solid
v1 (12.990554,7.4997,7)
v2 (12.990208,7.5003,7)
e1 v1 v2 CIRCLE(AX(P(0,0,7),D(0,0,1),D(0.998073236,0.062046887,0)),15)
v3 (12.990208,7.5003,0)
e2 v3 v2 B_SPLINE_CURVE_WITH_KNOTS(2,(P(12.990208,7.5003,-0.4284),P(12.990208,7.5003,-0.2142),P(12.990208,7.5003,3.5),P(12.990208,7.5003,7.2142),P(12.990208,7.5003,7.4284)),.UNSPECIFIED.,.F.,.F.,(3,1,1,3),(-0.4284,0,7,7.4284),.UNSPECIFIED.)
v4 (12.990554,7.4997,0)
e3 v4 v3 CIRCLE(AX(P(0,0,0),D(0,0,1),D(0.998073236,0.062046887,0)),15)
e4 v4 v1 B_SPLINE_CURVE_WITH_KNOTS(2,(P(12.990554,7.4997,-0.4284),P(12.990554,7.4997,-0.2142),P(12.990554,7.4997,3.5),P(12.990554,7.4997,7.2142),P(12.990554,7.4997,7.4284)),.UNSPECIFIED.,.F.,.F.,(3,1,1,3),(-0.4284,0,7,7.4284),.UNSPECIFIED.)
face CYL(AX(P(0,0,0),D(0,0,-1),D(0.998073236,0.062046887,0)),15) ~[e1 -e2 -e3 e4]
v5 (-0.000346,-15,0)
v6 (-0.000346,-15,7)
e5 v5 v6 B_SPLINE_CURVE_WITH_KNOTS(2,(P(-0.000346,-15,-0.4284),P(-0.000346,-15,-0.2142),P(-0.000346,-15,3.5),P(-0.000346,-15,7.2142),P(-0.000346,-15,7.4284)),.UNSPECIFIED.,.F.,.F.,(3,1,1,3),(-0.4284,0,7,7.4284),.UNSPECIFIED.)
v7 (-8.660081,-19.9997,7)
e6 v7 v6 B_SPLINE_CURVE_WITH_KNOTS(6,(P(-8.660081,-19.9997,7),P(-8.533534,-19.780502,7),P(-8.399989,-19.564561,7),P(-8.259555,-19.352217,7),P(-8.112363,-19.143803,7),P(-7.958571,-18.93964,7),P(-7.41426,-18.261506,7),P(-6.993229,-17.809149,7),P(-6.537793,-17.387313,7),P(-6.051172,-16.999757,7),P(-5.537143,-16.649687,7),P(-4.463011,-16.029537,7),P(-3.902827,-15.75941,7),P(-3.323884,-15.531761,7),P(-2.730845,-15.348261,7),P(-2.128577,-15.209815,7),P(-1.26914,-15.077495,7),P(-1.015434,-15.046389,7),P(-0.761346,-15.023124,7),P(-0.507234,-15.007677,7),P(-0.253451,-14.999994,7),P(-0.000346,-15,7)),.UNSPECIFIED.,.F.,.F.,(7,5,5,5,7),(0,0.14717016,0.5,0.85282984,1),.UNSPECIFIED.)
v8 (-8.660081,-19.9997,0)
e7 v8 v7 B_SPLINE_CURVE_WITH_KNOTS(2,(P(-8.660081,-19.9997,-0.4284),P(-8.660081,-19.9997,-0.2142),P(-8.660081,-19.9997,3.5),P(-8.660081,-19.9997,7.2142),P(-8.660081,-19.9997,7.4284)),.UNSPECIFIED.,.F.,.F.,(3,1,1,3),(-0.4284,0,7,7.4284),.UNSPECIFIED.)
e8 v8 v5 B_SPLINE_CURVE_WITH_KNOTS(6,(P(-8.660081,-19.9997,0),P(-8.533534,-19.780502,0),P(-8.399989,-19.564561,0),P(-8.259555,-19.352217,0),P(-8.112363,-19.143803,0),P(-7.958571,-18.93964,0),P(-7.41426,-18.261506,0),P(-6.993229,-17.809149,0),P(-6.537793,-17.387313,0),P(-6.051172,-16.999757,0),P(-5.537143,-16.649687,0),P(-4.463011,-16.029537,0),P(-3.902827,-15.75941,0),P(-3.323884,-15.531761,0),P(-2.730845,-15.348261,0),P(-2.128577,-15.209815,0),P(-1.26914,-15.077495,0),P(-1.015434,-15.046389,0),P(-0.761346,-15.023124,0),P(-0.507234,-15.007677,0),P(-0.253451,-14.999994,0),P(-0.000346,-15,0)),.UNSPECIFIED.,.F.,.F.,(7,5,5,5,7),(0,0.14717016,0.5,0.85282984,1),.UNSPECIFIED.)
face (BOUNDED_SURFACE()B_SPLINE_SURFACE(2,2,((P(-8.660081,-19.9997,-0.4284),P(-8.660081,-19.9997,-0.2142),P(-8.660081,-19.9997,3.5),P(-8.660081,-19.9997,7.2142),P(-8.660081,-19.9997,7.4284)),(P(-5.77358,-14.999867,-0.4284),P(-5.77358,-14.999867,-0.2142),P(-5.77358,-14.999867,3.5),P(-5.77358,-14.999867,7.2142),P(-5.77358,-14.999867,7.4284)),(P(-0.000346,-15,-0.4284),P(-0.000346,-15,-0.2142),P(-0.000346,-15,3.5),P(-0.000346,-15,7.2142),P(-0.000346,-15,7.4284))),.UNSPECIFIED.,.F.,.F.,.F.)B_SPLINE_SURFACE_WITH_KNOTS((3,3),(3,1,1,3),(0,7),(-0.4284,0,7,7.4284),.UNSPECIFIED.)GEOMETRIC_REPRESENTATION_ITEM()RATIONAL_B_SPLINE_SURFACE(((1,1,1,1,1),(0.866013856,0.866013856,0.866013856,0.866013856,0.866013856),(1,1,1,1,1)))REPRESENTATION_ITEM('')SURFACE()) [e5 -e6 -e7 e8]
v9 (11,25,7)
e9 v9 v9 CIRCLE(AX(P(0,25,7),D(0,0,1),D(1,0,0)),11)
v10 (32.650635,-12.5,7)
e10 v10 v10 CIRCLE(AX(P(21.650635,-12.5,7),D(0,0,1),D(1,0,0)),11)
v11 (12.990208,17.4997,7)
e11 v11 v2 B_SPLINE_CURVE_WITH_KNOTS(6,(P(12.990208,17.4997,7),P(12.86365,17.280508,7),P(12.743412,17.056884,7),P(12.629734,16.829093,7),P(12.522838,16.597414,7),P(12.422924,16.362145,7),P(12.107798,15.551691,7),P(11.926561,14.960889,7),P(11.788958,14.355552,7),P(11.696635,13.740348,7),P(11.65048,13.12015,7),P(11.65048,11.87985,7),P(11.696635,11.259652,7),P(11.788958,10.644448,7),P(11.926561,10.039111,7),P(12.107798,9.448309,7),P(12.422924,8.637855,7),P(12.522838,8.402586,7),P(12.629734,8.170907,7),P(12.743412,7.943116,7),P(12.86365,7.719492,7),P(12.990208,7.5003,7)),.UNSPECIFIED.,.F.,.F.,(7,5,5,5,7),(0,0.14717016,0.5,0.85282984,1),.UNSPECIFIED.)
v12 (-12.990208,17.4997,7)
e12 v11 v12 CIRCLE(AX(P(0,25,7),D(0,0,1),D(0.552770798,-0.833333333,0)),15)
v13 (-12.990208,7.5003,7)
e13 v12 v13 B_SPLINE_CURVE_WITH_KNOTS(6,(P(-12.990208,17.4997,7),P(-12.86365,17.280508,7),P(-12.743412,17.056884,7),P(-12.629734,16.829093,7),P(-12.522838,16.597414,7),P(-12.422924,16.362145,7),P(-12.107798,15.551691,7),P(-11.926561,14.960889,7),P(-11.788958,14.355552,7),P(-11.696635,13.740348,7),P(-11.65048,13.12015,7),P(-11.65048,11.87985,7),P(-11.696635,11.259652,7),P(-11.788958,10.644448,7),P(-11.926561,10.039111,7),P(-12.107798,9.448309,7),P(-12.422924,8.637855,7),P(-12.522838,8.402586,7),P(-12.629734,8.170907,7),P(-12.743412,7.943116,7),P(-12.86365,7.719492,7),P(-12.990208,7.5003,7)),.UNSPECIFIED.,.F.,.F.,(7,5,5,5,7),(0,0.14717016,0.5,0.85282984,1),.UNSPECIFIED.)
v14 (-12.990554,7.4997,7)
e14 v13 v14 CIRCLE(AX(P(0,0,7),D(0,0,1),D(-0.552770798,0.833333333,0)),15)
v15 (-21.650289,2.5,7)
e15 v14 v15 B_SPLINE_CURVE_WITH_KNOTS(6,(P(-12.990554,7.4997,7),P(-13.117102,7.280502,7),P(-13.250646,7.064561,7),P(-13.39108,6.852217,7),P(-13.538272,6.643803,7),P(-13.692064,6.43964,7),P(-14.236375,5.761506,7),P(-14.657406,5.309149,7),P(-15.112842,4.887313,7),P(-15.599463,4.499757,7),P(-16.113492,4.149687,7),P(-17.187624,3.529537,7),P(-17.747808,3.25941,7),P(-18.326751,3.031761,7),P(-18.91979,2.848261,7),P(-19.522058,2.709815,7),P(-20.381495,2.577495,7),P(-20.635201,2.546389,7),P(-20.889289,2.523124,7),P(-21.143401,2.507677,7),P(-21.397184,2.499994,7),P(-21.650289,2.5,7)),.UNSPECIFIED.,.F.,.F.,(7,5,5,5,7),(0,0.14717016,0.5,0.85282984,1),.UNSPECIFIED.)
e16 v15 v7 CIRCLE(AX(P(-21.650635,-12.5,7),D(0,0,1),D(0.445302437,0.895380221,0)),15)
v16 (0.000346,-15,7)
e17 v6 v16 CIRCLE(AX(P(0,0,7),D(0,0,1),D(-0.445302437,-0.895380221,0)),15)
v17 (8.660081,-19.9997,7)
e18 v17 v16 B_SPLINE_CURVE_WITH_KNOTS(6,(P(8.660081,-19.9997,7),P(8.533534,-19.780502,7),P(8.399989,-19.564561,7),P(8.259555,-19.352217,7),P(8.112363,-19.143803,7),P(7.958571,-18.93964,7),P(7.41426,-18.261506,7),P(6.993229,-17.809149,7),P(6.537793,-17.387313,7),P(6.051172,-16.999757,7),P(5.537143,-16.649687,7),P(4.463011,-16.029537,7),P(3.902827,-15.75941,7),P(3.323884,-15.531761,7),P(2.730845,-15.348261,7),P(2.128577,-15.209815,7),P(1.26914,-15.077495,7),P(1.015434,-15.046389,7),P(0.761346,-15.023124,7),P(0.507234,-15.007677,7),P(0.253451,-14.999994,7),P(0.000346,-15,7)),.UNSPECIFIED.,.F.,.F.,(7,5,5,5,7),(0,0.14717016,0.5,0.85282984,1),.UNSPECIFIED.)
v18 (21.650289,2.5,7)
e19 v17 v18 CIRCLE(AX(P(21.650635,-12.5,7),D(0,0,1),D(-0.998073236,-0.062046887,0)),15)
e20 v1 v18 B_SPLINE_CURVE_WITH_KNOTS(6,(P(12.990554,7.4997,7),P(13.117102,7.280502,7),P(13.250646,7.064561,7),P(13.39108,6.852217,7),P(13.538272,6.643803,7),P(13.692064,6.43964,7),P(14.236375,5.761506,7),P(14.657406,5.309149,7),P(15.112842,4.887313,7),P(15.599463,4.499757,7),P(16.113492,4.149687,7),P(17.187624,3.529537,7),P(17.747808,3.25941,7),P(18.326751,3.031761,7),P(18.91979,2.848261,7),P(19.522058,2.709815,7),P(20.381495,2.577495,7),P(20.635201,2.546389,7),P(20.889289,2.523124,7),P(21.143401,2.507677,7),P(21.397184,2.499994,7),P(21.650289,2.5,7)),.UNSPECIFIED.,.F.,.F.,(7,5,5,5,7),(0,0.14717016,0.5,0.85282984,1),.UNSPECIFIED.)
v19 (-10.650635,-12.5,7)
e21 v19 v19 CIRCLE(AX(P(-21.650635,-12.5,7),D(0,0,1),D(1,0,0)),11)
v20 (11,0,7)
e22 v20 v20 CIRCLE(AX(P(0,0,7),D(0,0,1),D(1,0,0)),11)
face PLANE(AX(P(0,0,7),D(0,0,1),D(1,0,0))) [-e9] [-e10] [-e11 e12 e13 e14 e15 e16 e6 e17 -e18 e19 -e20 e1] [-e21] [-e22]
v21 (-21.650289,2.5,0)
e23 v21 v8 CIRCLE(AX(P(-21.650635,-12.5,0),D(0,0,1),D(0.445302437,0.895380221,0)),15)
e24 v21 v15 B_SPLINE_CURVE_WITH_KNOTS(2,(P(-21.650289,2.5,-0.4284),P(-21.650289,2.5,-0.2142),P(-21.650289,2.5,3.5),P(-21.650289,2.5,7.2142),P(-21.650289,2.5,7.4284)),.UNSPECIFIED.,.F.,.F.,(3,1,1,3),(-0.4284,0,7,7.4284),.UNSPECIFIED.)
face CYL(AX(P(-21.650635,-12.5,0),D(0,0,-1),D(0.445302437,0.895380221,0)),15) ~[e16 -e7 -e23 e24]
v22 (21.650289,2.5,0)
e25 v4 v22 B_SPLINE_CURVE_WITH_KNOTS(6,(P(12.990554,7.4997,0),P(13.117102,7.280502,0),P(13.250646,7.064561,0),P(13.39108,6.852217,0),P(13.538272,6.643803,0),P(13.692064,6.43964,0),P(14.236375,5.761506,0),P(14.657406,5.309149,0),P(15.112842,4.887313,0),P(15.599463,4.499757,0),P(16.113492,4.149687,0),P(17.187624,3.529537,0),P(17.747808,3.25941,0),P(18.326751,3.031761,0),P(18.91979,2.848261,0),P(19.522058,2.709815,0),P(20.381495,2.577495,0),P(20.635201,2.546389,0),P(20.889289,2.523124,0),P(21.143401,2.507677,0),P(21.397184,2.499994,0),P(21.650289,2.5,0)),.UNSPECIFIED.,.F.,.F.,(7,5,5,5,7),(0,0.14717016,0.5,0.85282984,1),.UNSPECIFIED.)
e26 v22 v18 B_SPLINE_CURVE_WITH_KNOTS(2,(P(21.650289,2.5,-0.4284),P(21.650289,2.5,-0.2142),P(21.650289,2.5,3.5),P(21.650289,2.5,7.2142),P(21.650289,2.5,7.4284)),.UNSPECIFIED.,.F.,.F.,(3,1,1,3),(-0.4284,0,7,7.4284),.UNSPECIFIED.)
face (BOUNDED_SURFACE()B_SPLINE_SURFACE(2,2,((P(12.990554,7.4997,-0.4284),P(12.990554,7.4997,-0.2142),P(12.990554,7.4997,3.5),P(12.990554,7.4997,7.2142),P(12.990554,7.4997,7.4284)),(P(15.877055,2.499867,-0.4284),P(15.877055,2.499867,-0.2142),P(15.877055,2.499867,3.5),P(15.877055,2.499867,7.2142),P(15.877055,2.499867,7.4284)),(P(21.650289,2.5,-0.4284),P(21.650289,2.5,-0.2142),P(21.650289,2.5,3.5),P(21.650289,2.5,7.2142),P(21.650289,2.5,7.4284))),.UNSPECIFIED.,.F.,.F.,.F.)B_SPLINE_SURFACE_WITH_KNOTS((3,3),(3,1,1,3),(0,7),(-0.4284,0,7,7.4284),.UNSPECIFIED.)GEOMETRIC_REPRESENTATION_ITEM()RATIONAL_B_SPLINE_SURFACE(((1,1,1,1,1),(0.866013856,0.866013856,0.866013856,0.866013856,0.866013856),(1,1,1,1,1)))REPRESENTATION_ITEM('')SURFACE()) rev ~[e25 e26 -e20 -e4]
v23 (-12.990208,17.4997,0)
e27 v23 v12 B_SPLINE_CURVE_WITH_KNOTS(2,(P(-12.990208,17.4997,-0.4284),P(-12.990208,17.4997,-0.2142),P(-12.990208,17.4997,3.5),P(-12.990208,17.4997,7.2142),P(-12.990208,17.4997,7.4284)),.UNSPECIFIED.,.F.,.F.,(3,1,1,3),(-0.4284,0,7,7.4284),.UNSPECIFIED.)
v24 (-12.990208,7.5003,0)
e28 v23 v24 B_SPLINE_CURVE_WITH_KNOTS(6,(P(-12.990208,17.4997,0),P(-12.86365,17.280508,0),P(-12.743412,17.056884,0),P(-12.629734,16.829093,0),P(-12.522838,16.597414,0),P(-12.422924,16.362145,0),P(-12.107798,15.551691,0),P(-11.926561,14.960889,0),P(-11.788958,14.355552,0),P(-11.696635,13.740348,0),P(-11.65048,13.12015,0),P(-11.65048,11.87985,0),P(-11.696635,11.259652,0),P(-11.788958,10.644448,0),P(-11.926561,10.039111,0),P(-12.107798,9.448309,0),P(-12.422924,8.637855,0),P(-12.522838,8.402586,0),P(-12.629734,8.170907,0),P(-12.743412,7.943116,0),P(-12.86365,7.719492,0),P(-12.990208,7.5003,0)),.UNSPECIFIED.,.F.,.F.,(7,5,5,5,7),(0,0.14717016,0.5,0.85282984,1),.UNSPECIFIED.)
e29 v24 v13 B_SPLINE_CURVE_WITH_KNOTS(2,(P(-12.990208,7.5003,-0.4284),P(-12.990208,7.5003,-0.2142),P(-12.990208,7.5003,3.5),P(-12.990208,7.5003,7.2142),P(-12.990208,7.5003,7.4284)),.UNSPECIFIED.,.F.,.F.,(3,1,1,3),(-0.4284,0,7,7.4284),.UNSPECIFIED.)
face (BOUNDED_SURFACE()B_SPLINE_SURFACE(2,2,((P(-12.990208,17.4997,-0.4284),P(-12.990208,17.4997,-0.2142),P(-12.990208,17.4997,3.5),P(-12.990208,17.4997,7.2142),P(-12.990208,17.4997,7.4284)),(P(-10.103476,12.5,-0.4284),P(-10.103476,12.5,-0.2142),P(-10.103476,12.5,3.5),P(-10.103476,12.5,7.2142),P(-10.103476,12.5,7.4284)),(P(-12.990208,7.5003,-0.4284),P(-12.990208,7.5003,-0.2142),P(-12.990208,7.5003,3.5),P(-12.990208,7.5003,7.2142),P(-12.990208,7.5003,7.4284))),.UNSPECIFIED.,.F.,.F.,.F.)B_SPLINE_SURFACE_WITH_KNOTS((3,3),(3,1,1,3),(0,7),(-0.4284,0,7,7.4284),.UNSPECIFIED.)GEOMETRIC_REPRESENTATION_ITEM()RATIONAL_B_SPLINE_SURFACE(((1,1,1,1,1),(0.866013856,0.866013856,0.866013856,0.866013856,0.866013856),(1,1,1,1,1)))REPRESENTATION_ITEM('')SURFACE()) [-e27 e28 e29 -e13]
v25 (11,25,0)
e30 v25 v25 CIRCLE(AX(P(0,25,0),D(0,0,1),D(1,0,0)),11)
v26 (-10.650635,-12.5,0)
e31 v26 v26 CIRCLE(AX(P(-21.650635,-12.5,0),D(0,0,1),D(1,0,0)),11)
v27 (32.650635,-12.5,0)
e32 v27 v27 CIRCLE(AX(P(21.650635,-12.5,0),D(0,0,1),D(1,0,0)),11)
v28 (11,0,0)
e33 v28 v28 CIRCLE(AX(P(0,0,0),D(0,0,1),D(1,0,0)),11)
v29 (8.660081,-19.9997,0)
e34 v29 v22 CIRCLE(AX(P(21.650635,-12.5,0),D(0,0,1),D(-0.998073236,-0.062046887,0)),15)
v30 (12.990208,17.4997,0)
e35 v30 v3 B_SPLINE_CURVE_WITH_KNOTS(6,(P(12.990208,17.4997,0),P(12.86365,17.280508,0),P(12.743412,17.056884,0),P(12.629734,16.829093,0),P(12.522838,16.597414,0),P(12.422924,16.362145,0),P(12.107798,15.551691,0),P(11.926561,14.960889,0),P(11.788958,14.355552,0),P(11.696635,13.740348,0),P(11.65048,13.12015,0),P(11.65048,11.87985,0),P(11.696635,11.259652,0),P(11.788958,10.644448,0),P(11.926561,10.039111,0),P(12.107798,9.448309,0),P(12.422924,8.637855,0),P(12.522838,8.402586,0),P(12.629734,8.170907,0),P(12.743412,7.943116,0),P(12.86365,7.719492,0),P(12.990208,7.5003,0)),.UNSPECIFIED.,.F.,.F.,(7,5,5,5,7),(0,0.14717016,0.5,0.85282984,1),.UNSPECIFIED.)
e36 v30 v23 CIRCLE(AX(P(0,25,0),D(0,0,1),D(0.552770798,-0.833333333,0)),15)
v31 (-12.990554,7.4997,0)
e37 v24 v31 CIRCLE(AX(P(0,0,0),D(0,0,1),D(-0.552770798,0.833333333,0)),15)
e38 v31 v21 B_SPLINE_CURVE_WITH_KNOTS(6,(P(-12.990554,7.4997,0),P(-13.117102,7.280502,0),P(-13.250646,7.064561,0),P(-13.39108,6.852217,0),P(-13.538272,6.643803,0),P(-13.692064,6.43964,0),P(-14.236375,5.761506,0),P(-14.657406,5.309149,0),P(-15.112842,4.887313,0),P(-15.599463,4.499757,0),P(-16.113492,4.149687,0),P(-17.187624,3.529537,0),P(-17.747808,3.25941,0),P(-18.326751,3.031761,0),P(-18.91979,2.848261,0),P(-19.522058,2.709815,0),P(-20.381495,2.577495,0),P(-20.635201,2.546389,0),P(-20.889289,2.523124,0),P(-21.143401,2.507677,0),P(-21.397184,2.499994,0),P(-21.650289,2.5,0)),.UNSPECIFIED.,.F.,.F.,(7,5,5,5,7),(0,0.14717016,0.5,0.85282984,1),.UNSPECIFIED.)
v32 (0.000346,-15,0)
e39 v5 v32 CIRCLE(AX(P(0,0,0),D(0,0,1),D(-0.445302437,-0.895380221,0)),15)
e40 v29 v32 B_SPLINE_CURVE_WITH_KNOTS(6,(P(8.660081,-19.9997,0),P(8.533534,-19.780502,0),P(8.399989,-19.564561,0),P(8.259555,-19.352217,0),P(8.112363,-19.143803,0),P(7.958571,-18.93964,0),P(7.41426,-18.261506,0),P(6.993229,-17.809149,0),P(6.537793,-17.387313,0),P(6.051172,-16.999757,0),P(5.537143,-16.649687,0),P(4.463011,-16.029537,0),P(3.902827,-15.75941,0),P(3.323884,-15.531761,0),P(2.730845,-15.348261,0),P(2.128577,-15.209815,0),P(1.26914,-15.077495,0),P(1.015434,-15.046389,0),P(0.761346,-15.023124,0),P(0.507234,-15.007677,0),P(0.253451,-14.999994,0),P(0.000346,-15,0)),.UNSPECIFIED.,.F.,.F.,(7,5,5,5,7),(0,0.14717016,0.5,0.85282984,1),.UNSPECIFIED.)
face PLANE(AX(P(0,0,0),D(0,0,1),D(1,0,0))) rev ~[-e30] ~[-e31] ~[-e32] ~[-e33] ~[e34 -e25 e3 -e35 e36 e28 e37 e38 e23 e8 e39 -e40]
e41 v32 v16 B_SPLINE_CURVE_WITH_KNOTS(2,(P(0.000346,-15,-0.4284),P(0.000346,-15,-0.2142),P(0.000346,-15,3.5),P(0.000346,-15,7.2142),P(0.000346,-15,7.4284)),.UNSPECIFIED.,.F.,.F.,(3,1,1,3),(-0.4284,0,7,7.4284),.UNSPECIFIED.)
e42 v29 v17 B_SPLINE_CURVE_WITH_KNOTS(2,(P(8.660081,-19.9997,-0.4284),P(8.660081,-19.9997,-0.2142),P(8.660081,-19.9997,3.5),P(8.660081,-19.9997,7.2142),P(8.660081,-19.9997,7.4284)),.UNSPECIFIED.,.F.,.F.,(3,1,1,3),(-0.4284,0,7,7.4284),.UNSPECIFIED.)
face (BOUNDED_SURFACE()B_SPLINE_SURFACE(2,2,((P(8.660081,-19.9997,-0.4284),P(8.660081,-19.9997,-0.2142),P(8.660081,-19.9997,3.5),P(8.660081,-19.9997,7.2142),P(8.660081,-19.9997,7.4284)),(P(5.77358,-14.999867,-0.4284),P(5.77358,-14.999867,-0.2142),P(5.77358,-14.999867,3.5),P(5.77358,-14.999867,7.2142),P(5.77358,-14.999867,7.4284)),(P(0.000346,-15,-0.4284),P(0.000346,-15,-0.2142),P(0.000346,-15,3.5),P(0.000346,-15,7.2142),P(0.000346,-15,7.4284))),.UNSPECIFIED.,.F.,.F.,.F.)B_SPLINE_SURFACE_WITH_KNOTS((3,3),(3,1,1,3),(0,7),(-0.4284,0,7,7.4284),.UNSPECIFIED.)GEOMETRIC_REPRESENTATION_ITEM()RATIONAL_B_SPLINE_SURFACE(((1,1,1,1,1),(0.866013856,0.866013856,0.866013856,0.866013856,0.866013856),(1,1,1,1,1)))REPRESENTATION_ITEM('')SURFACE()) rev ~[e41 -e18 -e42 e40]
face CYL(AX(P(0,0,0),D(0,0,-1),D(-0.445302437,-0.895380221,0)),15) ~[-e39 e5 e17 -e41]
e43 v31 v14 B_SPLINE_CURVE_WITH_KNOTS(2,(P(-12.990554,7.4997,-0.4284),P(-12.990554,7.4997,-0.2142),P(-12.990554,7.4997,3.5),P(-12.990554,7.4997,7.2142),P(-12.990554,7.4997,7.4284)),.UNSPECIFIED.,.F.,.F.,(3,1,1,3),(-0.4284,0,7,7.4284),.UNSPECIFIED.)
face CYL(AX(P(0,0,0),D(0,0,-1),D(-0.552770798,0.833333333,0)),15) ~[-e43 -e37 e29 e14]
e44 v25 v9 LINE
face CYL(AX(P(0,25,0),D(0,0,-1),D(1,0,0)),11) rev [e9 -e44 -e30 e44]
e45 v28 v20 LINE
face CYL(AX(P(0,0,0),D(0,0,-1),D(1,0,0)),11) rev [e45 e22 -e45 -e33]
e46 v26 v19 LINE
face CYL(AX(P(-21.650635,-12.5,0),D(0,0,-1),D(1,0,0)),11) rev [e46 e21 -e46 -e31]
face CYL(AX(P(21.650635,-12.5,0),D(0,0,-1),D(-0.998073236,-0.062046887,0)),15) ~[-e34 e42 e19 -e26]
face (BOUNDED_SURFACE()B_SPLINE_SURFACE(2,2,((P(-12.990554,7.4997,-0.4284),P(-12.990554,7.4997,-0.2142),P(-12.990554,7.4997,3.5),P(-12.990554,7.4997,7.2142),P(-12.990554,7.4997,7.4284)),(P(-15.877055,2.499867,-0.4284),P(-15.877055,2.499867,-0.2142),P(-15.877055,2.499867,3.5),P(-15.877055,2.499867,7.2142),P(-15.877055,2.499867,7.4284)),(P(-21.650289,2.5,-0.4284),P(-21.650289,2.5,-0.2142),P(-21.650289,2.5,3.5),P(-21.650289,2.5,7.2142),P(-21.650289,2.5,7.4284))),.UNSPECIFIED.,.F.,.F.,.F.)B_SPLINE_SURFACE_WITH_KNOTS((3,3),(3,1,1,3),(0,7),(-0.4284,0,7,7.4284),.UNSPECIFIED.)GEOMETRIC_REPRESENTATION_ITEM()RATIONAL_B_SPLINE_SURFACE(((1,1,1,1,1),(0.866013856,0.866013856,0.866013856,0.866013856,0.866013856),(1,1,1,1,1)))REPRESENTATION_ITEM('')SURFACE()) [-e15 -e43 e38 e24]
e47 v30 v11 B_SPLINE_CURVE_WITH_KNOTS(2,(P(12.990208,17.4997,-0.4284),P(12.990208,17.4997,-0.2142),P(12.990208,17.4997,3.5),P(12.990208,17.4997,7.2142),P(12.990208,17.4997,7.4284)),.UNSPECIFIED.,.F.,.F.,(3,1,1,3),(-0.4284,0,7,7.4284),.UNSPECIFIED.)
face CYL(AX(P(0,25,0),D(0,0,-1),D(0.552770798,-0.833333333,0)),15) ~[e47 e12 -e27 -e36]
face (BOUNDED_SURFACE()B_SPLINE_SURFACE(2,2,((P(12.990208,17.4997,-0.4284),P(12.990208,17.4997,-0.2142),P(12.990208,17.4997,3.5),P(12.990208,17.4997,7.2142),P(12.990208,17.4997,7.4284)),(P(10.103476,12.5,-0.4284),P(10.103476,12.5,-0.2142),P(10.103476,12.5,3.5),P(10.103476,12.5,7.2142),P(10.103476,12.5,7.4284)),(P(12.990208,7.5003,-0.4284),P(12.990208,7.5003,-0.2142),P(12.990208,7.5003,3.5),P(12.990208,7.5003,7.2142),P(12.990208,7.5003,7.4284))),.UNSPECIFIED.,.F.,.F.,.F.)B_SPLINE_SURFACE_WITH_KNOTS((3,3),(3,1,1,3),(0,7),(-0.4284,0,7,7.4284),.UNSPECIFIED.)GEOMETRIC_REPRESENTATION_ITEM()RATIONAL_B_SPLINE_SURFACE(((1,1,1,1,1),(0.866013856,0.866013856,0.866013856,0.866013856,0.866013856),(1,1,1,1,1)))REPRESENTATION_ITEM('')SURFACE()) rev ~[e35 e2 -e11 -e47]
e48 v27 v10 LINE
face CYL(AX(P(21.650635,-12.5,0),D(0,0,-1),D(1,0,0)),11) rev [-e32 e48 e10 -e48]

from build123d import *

# Parameters (mm, degrees)
F0_R     = 11
F1_DEPTH = 7
F2_R     = 9.999


# Not quite as in the source:
# - a fillet or chamfer is up to 0.001 mm smaller than in the source, because OpenCascade refuses the exact size


with BuildPart() as f1:
    # F0 (on Top) → F1 (new body)
    with BuildSketch(Plane.XY):
        with BuildLine():
            ThreePointArc((8.2915619759, 12.5), (0, 40), (-8.2915619759, 12.5))
            ThreePointArc((-8.2915619759, 12.5), (-12.9903810568, 7.5), (-14.9710985352, 0.9307033082))
            ThreePointArc((-14.9710985352, 0.9307033082), (-34.6410161514, -20), (-6.6795365594, -13.4307033082))
            ThreePointArc((-6.6795365594, -13.4307033082), (0, -15), (6.6795365594, -13.4307033082))
            ThreePointArc((6.6795365594, -13.4307033082), (34.6410161514, -20), (14.9710985352, 0.9307033082))
            ThreePointArc((14.9710985352, 0.9307033082), (12.9903810568, 7.5), (8.2915619759, 12.5))
        make_face()
        with Locations((-21.6506350946, -12.5)):
            Circle(F0_R, mode=Mode.SUBTRACT)
        with Locations((21.6506350946, -12.5)):
            Circle(F0_R, mode=Mode.SUBTRACT)
        Circle(F0_R, mode=Mode.SUBTRACT)
        with Locations((0, 25)):
            Circle(F0_R, mode=Mode.SUBTRACT)
    extrude(amount=F1_DEPTH)

    # F2 (radius 10 in the source; OpenCascade refuses exactly that, so slightly less here)
    f2_edges = [f1.edges().sort_by_distance(p)[0] for p in [
        (-8.291562, 12.5, 3.5),
        (-14.971099, 0.930703, 3.5),
        (-6.679537, -13.430703, 3.5),
        (6.679537, -13.430703, 3.5),
        (14.971099, 0.930703, 3.5),
        (8.291562, 12.5, 3.5),
    ]]
    fillet(f2_edges, radius=F2_R)


solid = f1.part
